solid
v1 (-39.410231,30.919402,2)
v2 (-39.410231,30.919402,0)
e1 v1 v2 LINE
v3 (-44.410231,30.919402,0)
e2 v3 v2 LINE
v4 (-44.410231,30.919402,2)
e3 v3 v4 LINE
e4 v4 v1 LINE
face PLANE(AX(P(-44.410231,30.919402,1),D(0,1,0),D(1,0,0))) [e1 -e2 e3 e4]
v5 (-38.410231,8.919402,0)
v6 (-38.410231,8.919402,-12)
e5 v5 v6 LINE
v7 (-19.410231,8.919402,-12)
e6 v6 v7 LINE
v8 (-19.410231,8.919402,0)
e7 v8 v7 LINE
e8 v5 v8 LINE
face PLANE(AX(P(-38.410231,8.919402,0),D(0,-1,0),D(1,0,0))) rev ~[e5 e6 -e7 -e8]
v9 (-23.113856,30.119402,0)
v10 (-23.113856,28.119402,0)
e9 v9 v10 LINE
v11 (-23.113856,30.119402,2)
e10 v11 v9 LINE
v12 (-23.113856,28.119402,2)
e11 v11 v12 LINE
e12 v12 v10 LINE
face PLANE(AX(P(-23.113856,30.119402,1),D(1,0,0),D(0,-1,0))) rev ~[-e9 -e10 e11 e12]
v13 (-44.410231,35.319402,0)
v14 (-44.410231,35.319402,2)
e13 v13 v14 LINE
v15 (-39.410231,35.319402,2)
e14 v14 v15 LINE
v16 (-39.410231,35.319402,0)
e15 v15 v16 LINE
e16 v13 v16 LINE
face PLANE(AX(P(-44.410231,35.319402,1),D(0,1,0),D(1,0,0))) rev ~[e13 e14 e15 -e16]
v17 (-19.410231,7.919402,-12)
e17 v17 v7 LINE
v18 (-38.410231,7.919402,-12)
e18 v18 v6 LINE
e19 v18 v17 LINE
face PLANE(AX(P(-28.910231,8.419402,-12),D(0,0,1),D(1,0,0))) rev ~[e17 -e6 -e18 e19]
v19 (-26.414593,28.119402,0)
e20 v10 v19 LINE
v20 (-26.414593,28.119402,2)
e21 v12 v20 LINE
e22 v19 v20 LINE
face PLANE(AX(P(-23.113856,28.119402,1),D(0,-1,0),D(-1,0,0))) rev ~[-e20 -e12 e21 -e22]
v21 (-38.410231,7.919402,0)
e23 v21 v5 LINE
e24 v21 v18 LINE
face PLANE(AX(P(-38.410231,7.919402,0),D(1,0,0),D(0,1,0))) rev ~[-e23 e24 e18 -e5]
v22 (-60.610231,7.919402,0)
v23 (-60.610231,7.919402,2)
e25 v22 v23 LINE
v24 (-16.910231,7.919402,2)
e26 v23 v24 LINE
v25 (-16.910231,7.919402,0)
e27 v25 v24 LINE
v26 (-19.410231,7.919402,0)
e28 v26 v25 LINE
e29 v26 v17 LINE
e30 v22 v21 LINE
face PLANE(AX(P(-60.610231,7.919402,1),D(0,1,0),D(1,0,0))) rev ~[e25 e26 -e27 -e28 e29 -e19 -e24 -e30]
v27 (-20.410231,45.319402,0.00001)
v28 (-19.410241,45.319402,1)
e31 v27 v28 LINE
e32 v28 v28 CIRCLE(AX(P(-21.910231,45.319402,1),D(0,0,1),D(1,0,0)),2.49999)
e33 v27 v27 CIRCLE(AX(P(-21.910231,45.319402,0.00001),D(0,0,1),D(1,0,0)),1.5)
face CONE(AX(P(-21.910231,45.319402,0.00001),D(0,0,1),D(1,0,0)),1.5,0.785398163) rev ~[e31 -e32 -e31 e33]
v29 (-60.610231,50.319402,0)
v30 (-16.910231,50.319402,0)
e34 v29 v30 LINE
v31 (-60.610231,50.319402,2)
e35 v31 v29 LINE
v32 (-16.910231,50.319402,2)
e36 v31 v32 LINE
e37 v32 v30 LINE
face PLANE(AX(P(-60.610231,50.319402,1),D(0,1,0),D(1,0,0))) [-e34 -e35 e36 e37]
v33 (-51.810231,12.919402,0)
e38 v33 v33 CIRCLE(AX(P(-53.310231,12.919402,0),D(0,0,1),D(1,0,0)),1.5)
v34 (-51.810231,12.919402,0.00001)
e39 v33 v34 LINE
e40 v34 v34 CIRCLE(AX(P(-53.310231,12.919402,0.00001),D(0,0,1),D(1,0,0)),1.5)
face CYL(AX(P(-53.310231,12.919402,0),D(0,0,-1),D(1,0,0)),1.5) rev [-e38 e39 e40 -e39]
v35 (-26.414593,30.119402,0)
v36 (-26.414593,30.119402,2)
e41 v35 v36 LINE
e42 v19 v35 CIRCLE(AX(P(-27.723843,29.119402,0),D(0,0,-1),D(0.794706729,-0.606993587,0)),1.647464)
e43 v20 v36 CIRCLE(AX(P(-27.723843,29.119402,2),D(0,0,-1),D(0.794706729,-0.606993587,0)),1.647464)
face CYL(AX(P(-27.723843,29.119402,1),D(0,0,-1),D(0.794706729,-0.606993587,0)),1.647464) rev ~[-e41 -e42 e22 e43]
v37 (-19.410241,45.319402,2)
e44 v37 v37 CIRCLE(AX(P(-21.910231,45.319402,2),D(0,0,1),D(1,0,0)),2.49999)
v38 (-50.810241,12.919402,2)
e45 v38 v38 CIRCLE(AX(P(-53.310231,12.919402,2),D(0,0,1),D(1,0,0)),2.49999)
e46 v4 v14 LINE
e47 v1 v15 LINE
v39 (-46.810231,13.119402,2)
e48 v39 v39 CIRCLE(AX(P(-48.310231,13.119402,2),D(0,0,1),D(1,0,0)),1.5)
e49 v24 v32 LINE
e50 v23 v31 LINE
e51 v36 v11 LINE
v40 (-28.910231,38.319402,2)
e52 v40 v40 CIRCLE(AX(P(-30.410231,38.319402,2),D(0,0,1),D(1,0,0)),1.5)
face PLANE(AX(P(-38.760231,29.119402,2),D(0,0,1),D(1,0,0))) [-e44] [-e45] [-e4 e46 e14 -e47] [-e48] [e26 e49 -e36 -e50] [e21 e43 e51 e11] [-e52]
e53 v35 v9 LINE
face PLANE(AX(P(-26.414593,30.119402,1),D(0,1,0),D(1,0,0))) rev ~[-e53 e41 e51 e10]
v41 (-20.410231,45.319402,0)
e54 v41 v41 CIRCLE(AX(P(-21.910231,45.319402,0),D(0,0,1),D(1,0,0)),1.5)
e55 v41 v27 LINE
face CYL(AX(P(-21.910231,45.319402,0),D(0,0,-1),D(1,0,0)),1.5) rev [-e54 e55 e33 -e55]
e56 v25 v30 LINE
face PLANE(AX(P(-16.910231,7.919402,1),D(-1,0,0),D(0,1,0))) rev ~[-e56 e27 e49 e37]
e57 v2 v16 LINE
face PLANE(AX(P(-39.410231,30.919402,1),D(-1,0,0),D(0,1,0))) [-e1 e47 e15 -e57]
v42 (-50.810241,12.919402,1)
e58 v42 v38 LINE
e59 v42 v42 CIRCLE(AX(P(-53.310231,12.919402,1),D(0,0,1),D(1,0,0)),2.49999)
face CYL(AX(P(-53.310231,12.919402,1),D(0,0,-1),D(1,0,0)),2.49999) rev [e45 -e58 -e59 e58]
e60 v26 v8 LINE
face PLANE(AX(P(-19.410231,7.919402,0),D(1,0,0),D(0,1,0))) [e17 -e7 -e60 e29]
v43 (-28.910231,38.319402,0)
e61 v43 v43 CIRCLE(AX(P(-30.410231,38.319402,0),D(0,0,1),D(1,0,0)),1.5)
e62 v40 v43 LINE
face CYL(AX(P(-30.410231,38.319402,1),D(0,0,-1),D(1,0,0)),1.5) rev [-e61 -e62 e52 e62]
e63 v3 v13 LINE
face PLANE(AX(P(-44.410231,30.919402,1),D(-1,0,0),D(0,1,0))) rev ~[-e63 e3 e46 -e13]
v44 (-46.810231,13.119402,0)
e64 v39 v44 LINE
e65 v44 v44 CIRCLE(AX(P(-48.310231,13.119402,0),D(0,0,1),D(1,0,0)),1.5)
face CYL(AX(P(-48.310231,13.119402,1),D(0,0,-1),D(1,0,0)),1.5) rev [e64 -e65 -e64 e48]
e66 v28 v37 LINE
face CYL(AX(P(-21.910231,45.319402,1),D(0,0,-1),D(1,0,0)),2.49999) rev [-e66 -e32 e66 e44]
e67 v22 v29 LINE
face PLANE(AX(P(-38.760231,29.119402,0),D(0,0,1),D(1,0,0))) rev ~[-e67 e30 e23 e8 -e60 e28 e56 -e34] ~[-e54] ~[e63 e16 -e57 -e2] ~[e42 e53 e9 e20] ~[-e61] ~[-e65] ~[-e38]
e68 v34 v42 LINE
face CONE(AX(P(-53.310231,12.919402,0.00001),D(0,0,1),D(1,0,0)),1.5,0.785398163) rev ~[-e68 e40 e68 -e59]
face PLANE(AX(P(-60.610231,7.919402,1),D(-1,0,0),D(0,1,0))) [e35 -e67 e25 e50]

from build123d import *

# Parameters (mm, degrees)
F1_W     = 43.7
F1_H     = 42.4
F1_R     = 1.5
F1_W_2   = 5
F1_H_2   = 4.4
F2_DEPTH = 1
F3_SIZE  = 0.99999
F4_DEPTH = 1
F5_W     = 19
F5_H     = 1
F6_DEPTH = 12


# Not quite as in the source:
# - a fillet or chamfer is up to 0.001 mm smaller than in the source, because OpenCascade refuses the exact size


with BuildPart() as f2:
    # F1 (on face) → F2 (new body)
    with BuildSketch(Plane.XY):
        with Locations((-38.7602308843, 29.1194021702)):
            Rectangle(F1_W, F1_H)
        with Locations((-53.3102308843, 12.9194021702)):
            Circle(F1_R, mode=Mode.SUBTRACT)
        with Locations((-48.3102308843, 13.1194021702)):
            Circle(F1_R, mode=Mode.SUBTRACT)
        with Locations((-41.9102308843, 33.1194021702)):
            Rectangle(F1_W_2, F1_H_2, mode=Mode.SUBTRACT)
        with Locations((-30.4102308843, 38.3194021702)):
            Circle(F1_R, mode=Mode.SUBTRACT)
        with BuildLine():
            ThreePointArc((-26.4145926142, 28.1194021702), (-29.3713070947, 29.1194021702), (-26.4145926142, 30.1194021702))
            Line((-26.4145926142, 30.1194021702), (-23.1138560921, 30.1194021702))
            Line((-23.1138560921, 30.1194021702), (-23.1138560921, 28.1194021702))
            Line((-23.1138560921, 28.1194021702), (-26.4145926142, 28.1194021702))
        make_face(mode=Mode.SUBTRACT)
        with Locations((-21.9102308843, 45.3194021702)):
            Circle(F1_R, mode=Mode.SUBTRACT)
    extrude(amount=F2_DEPTH)

    # F3 (size 1 in the source; OpenCascade refuses exactly that, so slightly less here)
    f3_edges = [f2.edges().sort_by_distance(p)[0] for p in [
        (-23.410231, 45.319402, 1),
        (-54.810231, 12.919402, 1),
    ]]
    chamfer(f3_edges, length=F3_SIZE)

    # F4 (add): a face of the model
    f4_faces = [f2.faces().sort_by_distance(p)[0] for p in [
        (-38.8442562914, 29.0967487251, 1),
    ]]
    extrude(f4_faces, amount=F4_DEPTH)

    # F5 (on face) → F6 (join)
    with BuildSketch(Plane.XY):
        with Locations((-28.9102308843, 8.4194021702)):
            Rectangle(F5_W, F5_H)
    extrude(amount=-F6_DEPTH)


solid = f2.part
